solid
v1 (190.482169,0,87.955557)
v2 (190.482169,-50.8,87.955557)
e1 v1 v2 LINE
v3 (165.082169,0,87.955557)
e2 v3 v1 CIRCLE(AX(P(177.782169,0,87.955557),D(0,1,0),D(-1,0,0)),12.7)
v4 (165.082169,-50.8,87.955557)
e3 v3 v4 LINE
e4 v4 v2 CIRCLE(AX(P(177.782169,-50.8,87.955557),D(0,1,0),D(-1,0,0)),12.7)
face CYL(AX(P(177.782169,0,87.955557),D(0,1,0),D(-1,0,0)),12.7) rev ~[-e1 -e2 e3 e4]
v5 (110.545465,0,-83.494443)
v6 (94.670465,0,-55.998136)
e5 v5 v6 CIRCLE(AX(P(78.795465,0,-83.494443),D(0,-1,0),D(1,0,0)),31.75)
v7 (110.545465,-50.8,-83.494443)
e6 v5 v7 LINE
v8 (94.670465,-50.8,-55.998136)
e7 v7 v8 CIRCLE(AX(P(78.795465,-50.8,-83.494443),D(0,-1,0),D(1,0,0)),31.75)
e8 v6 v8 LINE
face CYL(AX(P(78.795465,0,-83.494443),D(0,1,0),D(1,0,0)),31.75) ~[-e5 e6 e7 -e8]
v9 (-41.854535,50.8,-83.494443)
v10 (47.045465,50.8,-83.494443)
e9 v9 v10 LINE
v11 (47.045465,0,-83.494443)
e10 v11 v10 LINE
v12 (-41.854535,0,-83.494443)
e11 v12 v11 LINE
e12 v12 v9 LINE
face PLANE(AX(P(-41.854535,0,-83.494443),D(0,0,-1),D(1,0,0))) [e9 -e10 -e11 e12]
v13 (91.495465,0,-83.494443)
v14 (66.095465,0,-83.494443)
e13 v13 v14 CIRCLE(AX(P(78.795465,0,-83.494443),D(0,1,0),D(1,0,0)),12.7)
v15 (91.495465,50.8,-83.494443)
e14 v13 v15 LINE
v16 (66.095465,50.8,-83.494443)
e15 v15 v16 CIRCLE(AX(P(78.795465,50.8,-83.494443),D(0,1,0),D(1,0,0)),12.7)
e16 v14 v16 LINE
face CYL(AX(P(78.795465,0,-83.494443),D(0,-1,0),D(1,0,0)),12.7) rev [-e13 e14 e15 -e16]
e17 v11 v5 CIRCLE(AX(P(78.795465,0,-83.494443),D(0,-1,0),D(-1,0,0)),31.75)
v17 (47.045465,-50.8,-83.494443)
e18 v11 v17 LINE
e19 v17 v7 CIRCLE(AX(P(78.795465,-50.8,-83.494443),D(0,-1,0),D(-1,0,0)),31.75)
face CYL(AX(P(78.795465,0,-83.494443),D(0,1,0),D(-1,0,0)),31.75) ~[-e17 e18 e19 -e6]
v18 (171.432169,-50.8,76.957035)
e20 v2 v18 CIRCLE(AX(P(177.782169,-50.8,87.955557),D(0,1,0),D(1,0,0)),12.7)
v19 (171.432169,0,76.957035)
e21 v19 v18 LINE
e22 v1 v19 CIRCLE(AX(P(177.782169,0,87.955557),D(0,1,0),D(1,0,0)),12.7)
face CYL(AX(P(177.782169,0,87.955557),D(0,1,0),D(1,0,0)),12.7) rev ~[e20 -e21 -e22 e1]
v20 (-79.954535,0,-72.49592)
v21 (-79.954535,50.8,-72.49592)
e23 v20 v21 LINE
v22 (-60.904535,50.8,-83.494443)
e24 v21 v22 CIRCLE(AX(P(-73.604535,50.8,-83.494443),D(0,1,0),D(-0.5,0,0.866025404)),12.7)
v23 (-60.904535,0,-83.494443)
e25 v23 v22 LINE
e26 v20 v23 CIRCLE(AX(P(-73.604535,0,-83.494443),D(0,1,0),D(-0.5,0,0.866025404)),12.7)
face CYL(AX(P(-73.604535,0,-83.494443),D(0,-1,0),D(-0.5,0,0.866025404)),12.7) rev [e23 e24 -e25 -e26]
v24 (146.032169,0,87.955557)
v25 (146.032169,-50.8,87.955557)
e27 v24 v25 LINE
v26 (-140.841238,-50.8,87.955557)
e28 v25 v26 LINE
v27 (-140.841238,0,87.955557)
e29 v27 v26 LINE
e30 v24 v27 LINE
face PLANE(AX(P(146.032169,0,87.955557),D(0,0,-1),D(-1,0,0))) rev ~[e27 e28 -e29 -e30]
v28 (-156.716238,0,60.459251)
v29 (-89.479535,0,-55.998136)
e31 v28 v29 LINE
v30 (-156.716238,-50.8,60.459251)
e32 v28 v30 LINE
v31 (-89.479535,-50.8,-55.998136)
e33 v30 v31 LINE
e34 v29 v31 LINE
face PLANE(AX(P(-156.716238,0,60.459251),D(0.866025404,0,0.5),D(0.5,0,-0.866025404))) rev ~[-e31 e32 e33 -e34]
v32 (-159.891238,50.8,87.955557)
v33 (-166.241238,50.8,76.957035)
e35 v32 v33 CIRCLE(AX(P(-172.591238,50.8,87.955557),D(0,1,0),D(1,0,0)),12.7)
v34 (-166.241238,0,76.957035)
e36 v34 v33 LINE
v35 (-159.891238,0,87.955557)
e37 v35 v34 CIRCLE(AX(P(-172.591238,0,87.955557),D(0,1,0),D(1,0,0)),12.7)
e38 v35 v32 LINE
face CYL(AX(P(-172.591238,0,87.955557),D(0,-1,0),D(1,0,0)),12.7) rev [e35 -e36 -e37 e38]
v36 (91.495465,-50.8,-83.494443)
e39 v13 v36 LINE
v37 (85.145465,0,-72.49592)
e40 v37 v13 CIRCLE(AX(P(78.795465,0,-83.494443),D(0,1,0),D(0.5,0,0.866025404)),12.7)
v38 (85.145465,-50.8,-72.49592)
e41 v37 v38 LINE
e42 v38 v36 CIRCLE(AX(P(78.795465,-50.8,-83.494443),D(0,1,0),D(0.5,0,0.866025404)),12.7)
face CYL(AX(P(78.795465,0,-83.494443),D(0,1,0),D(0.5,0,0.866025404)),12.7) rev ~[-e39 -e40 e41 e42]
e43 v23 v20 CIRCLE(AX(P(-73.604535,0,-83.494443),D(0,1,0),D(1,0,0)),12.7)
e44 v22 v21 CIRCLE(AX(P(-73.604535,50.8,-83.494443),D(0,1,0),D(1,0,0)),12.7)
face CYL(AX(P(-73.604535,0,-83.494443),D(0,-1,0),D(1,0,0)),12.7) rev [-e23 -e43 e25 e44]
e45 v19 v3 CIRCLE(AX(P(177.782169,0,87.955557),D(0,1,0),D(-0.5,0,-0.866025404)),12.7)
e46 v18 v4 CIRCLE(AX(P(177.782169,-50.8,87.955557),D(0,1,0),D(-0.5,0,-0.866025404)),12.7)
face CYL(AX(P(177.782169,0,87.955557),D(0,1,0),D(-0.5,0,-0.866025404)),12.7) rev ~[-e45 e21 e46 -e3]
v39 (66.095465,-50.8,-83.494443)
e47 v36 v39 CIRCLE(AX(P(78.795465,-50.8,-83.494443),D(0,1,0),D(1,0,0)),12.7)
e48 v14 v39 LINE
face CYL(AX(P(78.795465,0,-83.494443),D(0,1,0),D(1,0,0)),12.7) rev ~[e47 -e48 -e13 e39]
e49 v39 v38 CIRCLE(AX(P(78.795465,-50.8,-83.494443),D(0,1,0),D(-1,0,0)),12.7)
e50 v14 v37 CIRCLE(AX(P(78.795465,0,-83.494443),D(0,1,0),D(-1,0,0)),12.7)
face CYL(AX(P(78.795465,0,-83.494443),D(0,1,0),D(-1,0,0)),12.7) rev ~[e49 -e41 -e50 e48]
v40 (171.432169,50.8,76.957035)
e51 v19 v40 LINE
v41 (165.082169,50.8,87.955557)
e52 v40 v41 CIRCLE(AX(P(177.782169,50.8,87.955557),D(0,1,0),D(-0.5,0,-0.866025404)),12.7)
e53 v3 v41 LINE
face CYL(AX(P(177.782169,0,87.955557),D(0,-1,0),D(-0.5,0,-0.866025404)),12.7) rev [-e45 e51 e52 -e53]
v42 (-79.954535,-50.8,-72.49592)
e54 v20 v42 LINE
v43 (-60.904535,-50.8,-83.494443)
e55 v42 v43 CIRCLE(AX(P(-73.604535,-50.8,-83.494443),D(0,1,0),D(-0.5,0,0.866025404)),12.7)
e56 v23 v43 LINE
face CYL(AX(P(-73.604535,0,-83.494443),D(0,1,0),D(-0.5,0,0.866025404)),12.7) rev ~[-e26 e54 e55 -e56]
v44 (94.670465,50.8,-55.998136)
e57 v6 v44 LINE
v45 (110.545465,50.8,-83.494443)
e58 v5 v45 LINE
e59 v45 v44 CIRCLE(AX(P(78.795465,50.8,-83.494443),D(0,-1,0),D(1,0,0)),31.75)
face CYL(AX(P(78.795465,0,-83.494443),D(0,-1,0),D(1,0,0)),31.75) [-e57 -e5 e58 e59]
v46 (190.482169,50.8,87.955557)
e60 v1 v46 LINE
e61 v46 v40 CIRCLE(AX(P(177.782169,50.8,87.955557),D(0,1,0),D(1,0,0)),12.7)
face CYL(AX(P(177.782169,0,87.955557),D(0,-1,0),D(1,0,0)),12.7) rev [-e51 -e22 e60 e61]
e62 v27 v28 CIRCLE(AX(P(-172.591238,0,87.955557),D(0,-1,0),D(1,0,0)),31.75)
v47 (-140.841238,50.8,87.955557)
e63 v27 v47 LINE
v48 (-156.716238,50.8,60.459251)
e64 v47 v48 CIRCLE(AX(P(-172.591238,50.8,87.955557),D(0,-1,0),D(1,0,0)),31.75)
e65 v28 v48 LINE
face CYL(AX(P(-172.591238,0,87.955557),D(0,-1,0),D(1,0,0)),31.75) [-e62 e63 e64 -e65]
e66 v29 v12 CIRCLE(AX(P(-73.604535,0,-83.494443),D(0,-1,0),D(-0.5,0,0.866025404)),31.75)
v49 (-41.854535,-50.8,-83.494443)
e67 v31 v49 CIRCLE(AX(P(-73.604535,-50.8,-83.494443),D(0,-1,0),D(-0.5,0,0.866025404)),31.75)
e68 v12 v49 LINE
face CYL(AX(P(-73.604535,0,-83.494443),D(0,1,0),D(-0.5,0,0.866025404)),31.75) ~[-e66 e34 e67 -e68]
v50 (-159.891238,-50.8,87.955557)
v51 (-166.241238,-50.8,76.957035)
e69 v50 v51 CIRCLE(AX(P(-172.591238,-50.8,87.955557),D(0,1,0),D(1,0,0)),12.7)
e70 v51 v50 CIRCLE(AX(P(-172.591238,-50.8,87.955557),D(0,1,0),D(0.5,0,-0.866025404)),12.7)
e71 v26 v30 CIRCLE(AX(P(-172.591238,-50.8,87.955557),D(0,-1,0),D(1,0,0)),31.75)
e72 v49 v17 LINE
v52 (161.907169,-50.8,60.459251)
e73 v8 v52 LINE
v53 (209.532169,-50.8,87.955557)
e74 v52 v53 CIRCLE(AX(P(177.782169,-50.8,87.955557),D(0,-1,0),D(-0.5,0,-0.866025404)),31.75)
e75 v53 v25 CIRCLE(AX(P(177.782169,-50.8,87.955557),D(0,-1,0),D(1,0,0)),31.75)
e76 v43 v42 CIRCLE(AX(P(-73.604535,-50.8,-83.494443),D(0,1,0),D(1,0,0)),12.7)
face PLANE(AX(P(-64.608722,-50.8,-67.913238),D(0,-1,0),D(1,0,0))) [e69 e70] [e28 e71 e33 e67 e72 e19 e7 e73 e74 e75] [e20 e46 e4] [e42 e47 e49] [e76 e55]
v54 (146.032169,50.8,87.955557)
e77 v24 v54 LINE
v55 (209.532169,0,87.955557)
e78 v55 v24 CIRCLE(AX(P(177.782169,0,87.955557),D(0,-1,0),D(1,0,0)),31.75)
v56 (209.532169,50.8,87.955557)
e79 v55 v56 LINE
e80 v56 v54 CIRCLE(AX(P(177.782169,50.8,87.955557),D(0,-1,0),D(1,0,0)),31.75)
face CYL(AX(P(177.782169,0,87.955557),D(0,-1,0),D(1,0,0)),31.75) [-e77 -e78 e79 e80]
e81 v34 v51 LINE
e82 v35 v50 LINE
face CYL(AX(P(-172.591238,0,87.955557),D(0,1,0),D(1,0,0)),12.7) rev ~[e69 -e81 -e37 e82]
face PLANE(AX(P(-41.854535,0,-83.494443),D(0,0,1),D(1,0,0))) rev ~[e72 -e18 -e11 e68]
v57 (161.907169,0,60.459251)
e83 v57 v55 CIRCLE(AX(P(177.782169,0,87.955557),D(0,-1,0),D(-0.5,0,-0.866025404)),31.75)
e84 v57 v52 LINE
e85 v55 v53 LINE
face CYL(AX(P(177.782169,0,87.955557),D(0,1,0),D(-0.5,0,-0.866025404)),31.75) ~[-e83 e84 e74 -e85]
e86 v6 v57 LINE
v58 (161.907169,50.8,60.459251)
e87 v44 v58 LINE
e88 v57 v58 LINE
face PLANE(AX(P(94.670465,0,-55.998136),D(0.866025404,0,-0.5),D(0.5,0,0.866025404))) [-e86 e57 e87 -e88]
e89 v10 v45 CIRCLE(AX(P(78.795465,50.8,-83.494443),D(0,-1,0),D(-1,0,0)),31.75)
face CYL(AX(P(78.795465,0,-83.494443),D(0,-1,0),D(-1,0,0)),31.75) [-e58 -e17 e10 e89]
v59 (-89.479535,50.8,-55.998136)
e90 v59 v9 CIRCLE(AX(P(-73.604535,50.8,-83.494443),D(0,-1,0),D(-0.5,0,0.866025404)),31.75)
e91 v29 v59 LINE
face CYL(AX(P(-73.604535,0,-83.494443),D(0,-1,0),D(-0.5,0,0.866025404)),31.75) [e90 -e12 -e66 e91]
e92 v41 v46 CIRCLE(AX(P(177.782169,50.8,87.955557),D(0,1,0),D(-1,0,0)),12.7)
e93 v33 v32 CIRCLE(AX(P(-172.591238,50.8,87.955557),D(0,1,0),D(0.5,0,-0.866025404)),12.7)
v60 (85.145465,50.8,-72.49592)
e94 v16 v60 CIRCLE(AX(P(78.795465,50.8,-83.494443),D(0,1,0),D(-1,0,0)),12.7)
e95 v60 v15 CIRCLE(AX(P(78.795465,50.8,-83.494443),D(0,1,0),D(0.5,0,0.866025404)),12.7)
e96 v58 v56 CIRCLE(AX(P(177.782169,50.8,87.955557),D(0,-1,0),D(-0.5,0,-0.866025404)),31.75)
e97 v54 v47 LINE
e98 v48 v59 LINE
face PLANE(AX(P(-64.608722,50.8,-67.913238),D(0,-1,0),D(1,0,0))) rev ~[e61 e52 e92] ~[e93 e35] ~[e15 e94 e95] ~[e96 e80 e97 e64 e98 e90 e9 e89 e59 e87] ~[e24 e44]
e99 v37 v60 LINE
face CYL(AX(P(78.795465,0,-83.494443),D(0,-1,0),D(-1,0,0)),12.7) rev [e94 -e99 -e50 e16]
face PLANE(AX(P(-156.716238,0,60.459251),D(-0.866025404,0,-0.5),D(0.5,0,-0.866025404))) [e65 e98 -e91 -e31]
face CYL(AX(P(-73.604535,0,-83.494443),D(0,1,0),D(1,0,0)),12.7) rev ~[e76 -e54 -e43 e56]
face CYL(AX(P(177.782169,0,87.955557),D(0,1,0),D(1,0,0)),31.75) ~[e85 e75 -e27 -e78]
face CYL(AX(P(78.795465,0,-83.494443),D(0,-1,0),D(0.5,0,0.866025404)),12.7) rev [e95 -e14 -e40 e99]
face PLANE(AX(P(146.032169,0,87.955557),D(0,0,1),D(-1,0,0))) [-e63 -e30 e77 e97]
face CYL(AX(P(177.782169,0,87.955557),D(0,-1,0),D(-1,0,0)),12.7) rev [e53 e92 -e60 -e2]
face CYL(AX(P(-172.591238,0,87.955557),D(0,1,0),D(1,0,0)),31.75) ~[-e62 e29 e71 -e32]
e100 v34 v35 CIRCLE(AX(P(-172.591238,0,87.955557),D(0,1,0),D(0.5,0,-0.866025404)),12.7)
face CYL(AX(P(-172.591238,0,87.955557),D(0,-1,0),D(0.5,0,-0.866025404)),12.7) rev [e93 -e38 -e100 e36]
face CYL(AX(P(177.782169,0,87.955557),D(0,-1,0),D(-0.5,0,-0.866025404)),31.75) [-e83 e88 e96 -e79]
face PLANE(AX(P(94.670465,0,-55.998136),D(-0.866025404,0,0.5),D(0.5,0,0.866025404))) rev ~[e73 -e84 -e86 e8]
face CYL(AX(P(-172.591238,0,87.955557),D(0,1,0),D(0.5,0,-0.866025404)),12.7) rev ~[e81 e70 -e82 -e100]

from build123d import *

# Parameters (mm, degrees)
F1_DEPTH = 50.8


with BuildPart() as f1:
    # F0 (on Front) → F1 (new body, symmetric)
    with BuildSketch(Plane.XZ):
        with BuildLine():
            ThreePointArc((-79.9545346996, -72.4959198801), (-67.2545346996, -72.4959198801), (-60.9045346996, -83.4944425082))
            Line((-60.9045346996, -83.4944425082), (-41.8545346996, -83.4944425082))
            ThreePointArc((-41.8545346996, -83.4944425082), (-57.7295346996, -55.998135938), (-89.4795346996, -55.998135938))
            Line((-89.4795346996, -55.998135938), (-79.9545346996, -72.4959198801))
        make_face()
        with BuildLine():
            Line((-41.8545346996, -83.4944425082), (-60.9045346996, -83.4944425082))
            ThreePointArc((-60.9045346996, -83.4944425082), (-79.9545346996, -94.4929651363), (-79.9545346996, -72.4959198801))
            Line((-79.9545346996, -72.4959198801), (-89.4795346996, -55.998135938))
            ThreePointArc((-89.4795346996, -55.998135938), (-89.4795346996, -110.9907490783), (-41.8545346996, -83.4944425082))
        make_face()
        with BuildLine():
            ThreePointArc((-89.4795346996, -55.998135938), (-57.7295346996, -55.998135938), (-41.8545346996, -83.4944425082))
            Line((-41.8545346996, -83.4944425082), (47.0454653004, -83.4944425082))
            ThreePointArc((47.0454653004, -83.4944425082), (62.9204653004, -55.998135938), (94.6704653004, -55.998135938))
            Line((94.6704653004, -55.998135938), (161.9071689529, 60.4592509217))
            ThreePointArc((161.9071689529, 60.4592509217), (150.2858623828, 72.0805574918), (146.0321689529, 87.9555574918))
            Line((146.0321689529, 87.9555574918), (-140.8412383522, 87.9555574918))
            ThreePointArc((-140.8412383522, 87.9555574918), (-145.094931782, 72.0805574918), (-156.7162383522, 60.4592509217))
            Line((-156.7162383522, 60.4592509217), (-89.4795346996, -55.998135938))
        make_face()
        with BuildLine():
            ThreePointArc((94.6704653004, -55.998135938), (62.9204653004, -55.998135938), (47.0454653004, -83.4944425082))
            Line((47.0454653004, -83.4944425082), (66.0954653004, -83.4944425082))
            ThreePointArc((66.0954653004, -83.4944425082), (72.4454653004, -72.4959198801), (85.1454653004, -72.4959198801))
            Line((85.1454653004, -72.4959198801), (94.6704653004, -55.998135938))
        make_face()
        with BuildLine():
            Line((66.0954653004, -83.4944425082), (47.0454653004, -83.4944425082))
            ThreePointArc((47.0454653004, -83.4944425082), (78.7954653004, -115.2444425082), (110.5454653004, -83.4944425082))
            ThreePointArc((110.5454653004, -83.4944425082), (106.2917718705, -67.6194425082), (94.6704653004, -55.998135938))
            Line((94.6704653004, -55.998135938), (85.1454653004, -72.4959198801))
            ThreePointArc((85.1454653004, -72.4959198801), (89.7939879284, -77.1444425082), (91.4954653004, -83.4944425082))
            ThreePointArc((91.4954653004, -83.4944425082), (78.7954653004, -96.1944425082), (66.0954653004, -83.4944425082))
        make_face()
        with BuildLine():
            ThreePointArc((-140.8412383522, 87.9555574918), (-200.0875449223, 103.8305574918), (-156.7162383522, 60.4592509217))
            Line((-156.7162383522, 60.4592509217), (-166.2412383522, 76.9570348637))
            ThreePointArc((-166.2412383522, 76.9570348637), (-183.5897609803, 94.3055574918), (-159.8912383522, 87.9555574918))
            Line((-159.8912383522, 87.9555574918), (-140.8412383522, 87.9555574918))
        make_face()
        with BuildLine():
            Line((-166.2412383522, 76.9570348637), (-156.7162383522, 60.4592509217))
            ThreePointArc((-156.7162383522, 60.4592509217), (-145.094931782, 72.0805574918), (-140.8412383522, 87.9555574918))
            Line((-140.8412383522, 87.9555574918), (-159.8912383522, 87.9555574918))
            ThreePointArc((-159.8912383522, 87.9555574918), (-161.5927157241, 81.6055574918), (-166.2412383522, 76.9570348637))
        make_face()
        with BuildLine():
            ThreePointArc((146.0321689529, 87.9555574918), (150.2858623828, 72.0805574918), (161.9071689529, 60.4592509217))
            Line((161.9071689529, 60.4592509217), (171.4321689529, 76.9570348637))
            ThreePointArc((171.4321689529, 76.9570348637), (166.7836463249, 81.6055574918), (165.0821689529, 87.9555574918))
            Line((165.0821689529, 87.9555574918), (146.0321689529, 87.9555574918))
        make_face()
        with BuildLine():
            Line((171.4321689529, 76.9570348637), (161.9071689529, 60.4592509217))
            ThreePointArc((161.9071689529, 60.4592509217), (193.6571689529, 60.4592509217), (209.5321689529, 87.9555574918))
            ThreePointArc((209.5321689529, 87.9555574918), (177.7821689529, 119.7055574918), (146.0321689529, 87.9555574918))
            Line((146.0321689529, 87.9555574918), (165.0821689529, 87.9555574918))
            ThreePointArc((165.0821689529, 87.9555574918), (177.7821689529, 100.6555574918), (190.4821689529, 87.9555574918))
            ThreePointArc((190.4821689529, 87.9555574918), (184.1321689529, 76.9570348637), (171.4321689529, 76.9570348637))
        make_face()
    extrude(amount=F1_DEPTH, both=True)


solid = f1.part
